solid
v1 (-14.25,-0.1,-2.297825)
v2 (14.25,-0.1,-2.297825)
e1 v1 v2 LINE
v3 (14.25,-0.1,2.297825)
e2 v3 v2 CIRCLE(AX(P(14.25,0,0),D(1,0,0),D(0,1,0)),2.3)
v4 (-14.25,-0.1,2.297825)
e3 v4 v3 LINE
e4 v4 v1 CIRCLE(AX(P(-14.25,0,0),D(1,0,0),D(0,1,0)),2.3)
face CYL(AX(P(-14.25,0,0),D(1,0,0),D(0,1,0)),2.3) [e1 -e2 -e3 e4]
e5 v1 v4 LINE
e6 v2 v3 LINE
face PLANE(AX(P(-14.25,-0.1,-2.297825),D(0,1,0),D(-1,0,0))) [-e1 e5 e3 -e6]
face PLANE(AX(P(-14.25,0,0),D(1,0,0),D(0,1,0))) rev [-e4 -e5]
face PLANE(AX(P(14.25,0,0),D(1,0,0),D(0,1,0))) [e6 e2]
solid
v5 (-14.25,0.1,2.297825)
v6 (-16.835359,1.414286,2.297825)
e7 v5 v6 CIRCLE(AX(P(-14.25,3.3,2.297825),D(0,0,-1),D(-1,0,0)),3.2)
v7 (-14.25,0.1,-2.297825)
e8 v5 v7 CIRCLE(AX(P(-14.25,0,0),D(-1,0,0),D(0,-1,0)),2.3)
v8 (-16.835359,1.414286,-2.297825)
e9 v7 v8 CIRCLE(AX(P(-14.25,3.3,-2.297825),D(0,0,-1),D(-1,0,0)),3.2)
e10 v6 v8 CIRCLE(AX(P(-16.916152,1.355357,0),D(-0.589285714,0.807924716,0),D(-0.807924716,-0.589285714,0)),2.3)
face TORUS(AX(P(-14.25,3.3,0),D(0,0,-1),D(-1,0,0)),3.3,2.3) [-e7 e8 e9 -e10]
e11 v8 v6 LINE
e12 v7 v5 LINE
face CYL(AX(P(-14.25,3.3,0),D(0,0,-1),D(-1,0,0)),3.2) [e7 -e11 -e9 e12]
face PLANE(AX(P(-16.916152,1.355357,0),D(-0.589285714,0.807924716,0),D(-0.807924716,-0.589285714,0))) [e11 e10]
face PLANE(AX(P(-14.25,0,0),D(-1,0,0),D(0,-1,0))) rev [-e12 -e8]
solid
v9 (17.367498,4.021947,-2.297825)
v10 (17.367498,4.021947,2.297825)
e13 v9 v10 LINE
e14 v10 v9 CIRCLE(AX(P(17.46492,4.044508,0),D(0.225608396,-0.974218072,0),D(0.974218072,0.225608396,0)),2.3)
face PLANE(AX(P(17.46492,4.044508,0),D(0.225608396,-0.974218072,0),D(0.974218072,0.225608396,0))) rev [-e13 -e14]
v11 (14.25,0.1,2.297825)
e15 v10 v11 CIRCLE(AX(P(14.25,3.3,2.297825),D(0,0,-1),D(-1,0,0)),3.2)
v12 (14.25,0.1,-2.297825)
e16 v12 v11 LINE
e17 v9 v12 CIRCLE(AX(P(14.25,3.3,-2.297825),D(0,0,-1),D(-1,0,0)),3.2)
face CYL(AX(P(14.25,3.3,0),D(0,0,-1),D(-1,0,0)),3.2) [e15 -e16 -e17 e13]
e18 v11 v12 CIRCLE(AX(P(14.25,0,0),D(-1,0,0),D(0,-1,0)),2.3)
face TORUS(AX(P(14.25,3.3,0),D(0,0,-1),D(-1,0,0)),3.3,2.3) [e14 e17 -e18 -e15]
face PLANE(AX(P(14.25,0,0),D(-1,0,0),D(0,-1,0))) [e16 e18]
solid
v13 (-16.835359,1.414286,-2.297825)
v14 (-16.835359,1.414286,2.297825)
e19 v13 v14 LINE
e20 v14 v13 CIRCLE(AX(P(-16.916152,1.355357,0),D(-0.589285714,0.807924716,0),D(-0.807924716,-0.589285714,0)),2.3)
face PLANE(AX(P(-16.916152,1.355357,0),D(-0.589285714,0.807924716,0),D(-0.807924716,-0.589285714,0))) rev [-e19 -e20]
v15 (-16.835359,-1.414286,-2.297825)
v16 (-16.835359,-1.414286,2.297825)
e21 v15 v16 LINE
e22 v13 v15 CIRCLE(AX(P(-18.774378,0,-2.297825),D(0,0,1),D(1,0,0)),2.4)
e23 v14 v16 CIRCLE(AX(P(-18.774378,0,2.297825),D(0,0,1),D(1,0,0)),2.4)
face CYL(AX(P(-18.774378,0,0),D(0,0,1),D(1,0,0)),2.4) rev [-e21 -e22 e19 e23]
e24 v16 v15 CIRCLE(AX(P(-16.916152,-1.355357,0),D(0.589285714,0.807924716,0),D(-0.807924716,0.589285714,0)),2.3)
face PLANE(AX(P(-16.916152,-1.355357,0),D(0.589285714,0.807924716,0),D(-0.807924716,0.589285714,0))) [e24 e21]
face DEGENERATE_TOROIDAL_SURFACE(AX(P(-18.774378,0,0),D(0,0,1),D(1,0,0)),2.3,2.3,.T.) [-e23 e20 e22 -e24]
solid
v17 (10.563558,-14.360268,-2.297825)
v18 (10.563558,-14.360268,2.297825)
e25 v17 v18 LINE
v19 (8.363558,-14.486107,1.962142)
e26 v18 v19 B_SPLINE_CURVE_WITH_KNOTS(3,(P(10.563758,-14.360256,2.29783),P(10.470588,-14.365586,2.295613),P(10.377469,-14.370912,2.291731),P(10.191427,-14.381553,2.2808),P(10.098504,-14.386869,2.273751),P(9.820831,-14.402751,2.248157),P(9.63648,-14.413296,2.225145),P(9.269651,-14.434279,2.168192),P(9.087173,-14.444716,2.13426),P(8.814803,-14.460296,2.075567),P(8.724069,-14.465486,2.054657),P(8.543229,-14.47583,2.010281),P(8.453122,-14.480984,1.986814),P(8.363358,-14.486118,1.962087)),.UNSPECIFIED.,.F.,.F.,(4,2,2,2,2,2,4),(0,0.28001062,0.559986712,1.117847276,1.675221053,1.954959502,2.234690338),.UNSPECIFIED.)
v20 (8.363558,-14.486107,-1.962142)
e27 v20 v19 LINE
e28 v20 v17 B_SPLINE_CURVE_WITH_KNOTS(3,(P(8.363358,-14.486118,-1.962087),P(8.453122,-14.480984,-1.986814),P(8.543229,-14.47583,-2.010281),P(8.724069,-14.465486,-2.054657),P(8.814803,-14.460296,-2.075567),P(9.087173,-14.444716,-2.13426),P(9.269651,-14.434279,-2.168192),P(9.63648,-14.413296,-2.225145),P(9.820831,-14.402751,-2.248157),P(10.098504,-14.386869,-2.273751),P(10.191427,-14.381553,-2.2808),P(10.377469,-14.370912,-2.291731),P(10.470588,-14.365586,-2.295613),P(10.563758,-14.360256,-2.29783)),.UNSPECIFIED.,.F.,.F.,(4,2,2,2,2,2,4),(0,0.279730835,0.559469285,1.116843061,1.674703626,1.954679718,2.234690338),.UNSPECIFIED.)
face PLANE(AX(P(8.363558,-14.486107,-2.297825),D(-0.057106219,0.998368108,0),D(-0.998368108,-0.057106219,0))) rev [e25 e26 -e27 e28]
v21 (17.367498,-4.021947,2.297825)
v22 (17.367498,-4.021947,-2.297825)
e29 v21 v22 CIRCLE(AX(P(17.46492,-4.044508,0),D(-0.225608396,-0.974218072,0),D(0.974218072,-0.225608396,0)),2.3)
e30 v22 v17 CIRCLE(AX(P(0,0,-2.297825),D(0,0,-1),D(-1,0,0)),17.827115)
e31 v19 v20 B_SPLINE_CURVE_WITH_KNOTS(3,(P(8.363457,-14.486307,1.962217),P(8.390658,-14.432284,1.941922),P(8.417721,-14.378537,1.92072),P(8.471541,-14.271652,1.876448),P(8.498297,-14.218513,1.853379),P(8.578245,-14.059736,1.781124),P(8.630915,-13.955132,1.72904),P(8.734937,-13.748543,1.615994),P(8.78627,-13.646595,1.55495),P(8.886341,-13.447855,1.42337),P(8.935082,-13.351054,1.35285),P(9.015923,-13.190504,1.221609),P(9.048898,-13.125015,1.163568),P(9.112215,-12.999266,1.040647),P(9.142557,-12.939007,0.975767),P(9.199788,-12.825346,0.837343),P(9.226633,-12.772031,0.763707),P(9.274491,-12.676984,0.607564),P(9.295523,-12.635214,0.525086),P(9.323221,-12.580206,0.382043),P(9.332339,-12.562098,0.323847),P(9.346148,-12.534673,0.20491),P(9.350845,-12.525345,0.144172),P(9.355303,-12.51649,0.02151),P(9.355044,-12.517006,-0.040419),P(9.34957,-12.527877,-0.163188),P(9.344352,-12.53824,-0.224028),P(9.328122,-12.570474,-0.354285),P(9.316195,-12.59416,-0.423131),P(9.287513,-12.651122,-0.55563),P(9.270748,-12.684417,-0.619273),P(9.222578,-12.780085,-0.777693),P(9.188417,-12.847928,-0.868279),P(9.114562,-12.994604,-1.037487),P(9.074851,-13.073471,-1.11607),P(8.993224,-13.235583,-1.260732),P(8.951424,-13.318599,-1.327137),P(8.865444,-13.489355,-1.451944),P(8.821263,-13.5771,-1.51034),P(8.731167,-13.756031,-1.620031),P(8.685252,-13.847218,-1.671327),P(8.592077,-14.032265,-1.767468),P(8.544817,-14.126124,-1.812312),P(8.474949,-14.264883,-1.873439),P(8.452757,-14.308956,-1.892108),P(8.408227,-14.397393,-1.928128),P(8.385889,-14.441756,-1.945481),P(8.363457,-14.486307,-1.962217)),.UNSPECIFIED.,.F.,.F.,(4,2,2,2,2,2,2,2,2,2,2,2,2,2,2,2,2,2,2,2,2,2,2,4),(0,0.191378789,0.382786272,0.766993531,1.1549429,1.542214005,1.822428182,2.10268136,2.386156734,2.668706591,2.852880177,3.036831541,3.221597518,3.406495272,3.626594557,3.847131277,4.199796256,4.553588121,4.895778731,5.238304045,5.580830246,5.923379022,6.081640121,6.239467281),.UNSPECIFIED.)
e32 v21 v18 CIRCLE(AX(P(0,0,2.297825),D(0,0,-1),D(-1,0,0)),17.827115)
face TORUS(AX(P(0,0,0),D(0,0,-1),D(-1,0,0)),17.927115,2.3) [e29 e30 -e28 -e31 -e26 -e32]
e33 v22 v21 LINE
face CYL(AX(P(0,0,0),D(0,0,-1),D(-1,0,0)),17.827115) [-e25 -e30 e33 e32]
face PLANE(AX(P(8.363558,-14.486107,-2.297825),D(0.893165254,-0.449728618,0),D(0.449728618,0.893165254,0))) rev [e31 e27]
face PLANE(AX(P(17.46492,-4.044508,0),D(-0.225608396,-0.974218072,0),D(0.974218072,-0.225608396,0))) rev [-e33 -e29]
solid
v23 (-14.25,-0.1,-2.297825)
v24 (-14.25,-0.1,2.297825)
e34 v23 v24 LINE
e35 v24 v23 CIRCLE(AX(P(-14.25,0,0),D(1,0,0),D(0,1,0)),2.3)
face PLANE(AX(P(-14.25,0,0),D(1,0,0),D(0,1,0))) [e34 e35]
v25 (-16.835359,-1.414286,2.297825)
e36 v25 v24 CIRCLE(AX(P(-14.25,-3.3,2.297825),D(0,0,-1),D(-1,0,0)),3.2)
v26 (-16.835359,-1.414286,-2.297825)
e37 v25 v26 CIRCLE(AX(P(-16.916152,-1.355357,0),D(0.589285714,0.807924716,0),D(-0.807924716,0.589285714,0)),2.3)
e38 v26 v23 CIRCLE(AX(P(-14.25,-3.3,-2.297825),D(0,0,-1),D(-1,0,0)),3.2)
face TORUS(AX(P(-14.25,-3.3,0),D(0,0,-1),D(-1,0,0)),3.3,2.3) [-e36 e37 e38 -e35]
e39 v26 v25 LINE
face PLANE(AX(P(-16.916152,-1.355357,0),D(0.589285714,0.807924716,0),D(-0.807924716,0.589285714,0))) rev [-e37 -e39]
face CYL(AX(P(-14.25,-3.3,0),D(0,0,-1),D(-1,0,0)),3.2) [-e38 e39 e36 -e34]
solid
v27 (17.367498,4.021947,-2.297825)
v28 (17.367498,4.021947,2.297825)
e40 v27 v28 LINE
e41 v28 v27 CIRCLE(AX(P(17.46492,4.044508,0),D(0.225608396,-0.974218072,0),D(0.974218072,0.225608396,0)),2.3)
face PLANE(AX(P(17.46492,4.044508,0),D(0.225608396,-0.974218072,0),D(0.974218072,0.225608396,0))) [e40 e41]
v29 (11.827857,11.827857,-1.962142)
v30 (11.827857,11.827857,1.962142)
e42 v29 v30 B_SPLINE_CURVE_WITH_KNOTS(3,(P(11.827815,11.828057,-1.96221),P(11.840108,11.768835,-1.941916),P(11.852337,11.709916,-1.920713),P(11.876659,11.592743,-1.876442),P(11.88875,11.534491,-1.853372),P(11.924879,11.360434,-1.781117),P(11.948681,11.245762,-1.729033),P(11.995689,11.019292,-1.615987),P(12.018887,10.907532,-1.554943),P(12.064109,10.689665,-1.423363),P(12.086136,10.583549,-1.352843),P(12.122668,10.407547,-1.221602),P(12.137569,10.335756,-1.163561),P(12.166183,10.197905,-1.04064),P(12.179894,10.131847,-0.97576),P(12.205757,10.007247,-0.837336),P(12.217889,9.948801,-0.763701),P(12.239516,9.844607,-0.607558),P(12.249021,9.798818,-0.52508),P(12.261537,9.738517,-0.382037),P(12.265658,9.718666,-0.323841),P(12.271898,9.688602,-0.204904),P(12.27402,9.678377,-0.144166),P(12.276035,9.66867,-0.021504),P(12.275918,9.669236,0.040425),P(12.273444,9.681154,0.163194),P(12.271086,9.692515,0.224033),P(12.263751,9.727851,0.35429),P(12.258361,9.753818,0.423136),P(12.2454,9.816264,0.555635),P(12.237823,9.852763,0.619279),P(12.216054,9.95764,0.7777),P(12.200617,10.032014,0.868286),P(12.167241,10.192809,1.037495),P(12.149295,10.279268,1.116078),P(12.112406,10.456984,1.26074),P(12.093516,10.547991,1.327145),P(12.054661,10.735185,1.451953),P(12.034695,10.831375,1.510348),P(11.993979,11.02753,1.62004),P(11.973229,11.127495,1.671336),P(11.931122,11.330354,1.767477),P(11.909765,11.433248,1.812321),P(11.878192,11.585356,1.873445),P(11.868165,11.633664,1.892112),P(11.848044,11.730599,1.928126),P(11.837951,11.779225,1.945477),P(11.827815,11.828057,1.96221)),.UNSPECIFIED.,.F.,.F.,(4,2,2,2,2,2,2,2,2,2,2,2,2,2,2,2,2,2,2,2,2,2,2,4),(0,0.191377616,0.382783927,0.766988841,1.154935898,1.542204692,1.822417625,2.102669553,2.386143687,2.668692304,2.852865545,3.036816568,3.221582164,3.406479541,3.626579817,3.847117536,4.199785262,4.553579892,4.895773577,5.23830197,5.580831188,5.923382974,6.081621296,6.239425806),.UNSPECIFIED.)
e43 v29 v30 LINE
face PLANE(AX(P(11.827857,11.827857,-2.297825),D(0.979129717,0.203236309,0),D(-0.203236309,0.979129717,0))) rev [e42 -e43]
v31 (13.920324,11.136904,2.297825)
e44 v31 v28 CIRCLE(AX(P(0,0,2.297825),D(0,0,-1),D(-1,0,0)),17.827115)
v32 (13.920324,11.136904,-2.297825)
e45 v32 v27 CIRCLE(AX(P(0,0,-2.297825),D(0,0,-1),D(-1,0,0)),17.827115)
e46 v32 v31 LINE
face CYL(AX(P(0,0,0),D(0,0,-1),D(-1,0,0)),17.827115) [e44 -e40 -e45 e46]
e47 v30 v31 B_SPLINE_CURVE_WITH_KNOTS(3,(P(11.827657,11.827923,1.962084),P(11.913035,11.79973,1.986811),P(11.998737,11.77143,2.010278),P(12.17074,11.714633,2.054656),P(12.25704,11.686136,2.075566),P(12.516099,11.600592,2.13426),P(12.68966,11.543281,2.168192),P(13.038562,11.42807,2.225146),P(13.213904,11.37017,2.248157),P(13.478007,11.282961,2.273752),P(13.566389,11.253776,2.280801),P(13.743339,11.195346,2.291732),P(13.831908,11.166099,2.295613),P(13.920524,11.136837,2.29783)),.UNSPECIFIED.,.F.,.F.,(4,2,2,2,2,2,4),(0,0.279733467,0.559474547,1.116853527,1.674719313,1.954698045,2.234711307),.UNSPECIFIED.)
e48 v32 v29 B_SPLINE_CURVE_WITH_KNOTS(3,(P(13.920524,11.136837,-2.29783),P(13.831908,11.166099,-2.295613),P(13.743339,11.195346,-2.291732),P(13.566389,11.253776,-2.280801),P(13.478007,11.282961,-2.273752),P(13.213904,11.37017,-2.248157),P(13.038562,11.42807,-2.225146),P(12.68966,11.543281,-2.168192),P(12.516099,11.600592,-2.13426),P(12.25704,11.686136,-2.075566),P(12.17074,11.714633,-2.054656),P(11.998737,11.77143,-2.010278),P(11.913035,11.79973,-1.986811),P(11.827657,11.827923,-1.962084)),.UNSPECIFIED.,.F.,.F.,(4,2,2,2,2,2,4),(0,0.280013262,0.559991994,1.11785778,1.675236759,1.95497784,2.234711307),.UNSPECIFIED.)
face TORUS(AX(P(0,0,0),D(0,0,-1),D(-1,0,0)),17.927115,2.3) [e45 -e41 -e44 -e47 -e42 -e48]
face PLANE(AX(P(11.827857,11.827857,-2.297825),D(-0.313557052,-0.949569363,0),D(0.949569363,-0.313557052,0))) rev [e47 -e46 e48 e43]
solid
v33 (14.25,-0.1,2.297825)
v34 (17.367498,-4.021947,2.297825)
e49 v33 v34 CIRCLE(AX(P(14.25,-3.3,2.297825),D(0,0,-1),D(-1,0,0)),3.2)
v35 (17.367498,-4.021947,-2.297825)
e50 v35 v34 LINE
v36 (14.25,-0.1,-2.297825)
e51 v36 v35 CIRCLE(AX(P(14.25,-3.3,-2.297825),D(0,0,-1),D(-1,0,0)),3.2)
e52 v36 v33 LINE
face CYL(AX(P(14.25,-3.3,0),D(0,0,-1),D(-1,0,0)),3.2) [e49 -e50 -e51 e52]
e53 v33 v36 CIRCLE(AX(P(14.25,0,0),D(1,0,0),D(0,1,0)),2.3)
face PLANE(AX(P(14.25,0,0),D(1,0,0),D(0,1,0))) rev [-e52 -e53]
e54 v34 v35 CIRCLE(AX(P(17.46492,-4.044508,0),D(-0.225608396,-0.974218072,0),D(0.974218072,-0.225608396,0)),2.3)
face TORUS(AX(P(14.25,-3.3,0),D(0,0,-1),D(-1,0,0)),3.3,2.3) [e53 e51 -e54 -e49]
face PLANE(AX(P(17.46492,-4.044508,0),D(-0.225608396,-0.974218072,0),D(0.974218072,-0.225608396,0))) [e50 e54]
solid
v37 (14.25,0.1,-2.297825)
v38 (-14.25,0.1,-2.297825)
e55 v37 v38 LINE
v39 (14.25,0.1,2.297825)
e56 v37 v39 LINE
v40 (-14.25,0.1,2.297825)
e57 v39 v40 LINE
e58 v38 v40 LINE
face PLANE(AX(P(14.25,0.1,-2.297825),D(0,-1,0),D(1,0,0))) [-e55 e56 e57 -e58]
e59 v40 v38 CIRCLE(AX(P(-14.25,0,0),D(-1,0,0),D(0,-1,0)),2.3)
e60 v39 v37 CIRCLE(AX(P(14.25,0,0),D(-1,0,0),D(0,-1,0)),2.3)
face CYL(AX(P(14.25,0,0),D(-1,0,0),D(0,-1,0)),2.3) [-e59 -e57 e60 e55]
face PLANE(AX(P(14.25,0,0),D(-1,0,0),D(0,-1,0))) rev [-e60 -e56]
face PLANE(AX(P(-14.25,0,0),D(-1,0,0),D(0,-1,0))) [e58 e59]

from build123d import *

# Parameters (mm, degrees)
STRUCTURAL_MEMBER1_ANGLE   = 46.961343
STRUCTURAL_MEMBER1_2_ANGLE = 103.038657
STRUCTURAL_START           = -14.25
STRUCTURAL_MEMBER1_3_DEPTH = 28.5
STRUCTURAL_MEMBER1_4_ANGLE = 53.893663
STRUCTURAL_MEMBER1_5_ANGLE = 287.787327
STRUCTURAL_MEMBER1_6_ANGLE = 53.893663
STRUCTURAL_MEMBER1_7_DEPTH = 28.5
STRUCTURAL_MEMBER1_8_ANGLE = 103.038657
STRUCTURAL_MEMBER1_9_ANGLE = 31.961343
EXTRUDE1_DEPTH             = 29.106869247
EXTRUDE1_DEPTH_BACK        = 29.106869247


# Read off the part's stored shape, not the designer's step: Structural Member1
with BuildPart() as part:
    # Structural Member1 outline → Structural Member1 (revolve)
    with BuildSketch(Plane(origin=(0, 0, 0), x_dir=(0.5000000000000149, -0.86602540378443, 0), z_dir=(-0.86602540378443, -0.5000000000000149, 0))):
        with BuildLine():
            ThreePointArc((17.827115232, 2.297825059), (15.627115232, 0), (17.827115232, -2.297825059))
            Line((17.827115232, -2.297825059), (17.827115232, 2.297825059))
        make_face()
    revolve(axis=Axis((0, 0, 0), (0, 0, 1)), revolution_arc=STRUCTURAL_MEMBER1_ANGLE)


with BuildPart() as body_2:
    # Structural Member1 2 outline → Structural Member1 2 (revolve)
    with BuildSketch(Plane(origin=(14.25, -3.3, 0), x_dir=(0.974218072006789, -0.2256083956225363, 0), z_dir=(-0.2256083956225363, -0.974218072006789, 0))):
        with BuildLine():
            ThreePointArc((3.2, 2.297825059), (1, 0), (3.2, -2.297825059))
            Line((3.2, -2.297825059), (3.2, 2.297825059))
        make_face()
    revolve(axis=Axis((14.25, -3.3, 0), (0, 0, 1)), revolution_arc=STRUCTURAL_MEMBER1_2_ANGLE)


with BuildPart() as body_3:
    # Structural Member1 3 outline → Structural Member1 3 (new body)
    with BuildSketch(Plane.YZ.offset(STRUCTURAL_START)):
        with BuildLine():
            Line((-0.1, -2.297825059), (-0.1, 2.297825059))
            ThreePointArc((-0.1, 2.297825059), (-2.3, 0), (-0.1, -2.297825059))
        make_face()
    extrude(amount=STRUCTURAL_MEMBER1_3_DEPTH)


with BuildPart() as body_4:
    # Structural Member1 4 outline → Structural Member1 4 (revolve)
    with BuildSketch(Plane(origin=(-14.25, -3.3, 0), x_dir=(0, 1, 0), z_dir=(1, 0, 0))):
        with BuildLine():
            ThreePointArc((3.2, 2.297825059), (1, 0), (3.2, -2.297825059))
            Line((3.2, -2.297825059), (3.2, 2.297825059))
        make_face()
    revolve(axis=Axis((-14.25, -3.3, 0), (0, 0, 1)), revolution_arc=STRUCTURAL_MEMBER1_4_ANGLE)


with BuildPart() as body_5:
    # Structural Member1 5 outline → Structural Member1 5 (revolve)
    with BuildSketch(Plane(origin=(-18.77437841, 0, 0), x_dir=(0.8079247161331453, 0.5892857142856737, 0), z_dir=(0.5892857142856737, -0.8079247161331453, 0))):
        with BuildLine():
            Line((2.4, 2.297825059), (2.4, -2.297825059))
            ThreePointArc((2.4, -2.297825059), (4.6, 0), (2.4, 2.297825059))
        make_face()
    revolve(axis=Axis((-18.77437841, 0, 0), (0, 0, 1)), revolution_arc=STRUCTURAL_MEMBER1_5_ANGLE)


with BuildPart() as body_6:
    # Structural Member1 6 outline → Structural Member1 6 (revolve)
    with BuildSketch(Plane(origin=(-14.25, 3.3, 0), x_dir=(-0.8079247161331524, -0.5892857142856639, 0), z_dir=(-0.5892857142856639, 0.8079247161331524, 0))):
        with BuildLine():
            ThreePointArc((3.2, 2.297825059), (1, 0), (3.2, -2.297825059))
            Line((3.2, -2.297825059), (3.2, 2.297825059))
        make_face()
    revolve(axis=Axis((-14.25, 3.3, 0), (0, 0, 1)), revolution_arc=STRUCTURAL_MEMBER1_6_ANGLE)


with BuildPart() as body_7:
    # Structural Member1 7 outline → Structural Member1 7 (new body)
    with BuildSketch(Plane.YZ.offset(STRUCTURAL_START)):
        with BuildLine():
            ThreePointArc((0.1, -2.297825059), (2.3, 0), (0.1, 2.297825059))
            Line((0.1, 2.297825059), (0.1, -2.297825059))
        make_face()
    extrude(amount=STRUCTURAL_MEMBER1_7_DEPTH)


with BuildPart() as body_8:
    # Structural Member1 8 outline → Structural Member1 8 (revolve)
    with BuildSketch(Plane(origin=(14.25, 3.3, 0), x_dir=(0, -1, 0), z_dir=(-1, 0, 0))):
        with BuildLine():
            ThreePointArc((3.2, 2.297825059), (1, 0), (3.2, -2.297825059))
            Line((3.2, -2.297825059), (3.2, 2.297825059))
        make_face()
    revolve(axis=Axis((14.25, 3.3, 0), (0, 0, 1)), revolution_arc=STRUCTURAL_MEMBER1_8_ANGLE)


with BuildPart() as body_9:
    # Structural Member1 9 outline → Structural Member1 9 (revolve)
    with BuildSketch(Plane(origin=(0, 0, 0), x_dir=(0.9742180720067738, 0.22560839562260226, 0), z_dir=(0.22560839562260226, -0.9742180720067738, 0))):
        with BuildLine():
            ThreePointArc((17.827115232, 2.297825059), (15.627115232, 0), (17.827115232, -2.297825059))
            Line((17.827115232, -2.297825059), (17.827115232, 2.297825059))
        make_face()
    revolve(axis=Axis((0, 0, 0), (0, 0, 1)), revolution_arc=STRUCTURAL_MEMBER1_9_ANGLE)


with BuildPart() as extrude1_tool:
    # Sketch12 → Extrude1 (new, two sides: drawn at the far end of the back side and taken through both)
    with BuildSketch(Plane.XY.offset(-EXTRUDE1_DEPTH_BACK)):
        with BuildLine():
            Line((11.82785661, 11.82785661), (13.920323888, 11.136903534))
            ThreePointArc((13.920323888, 11.136903534), (10.361203328, 13.472473166), (12.275707333, 9.670250253))
            Line((12.275707333, 9.670250253), (11.82785661, 11.82785661))
        make_face()
        with BuildLine():
            Line((8.363557616, -14.486106723), (10.563557616, -14.360267685))
            ThreePointArc((10.563557616, -14.360267685), (6.521221246, -15.695086526), (9.354577812, -12.517931315))
            Line((9.354577812, -12.517931315), (8.363557616, -14.486106723))
        make_face()
    extrude(amount=EXTRUDE1_DEPTH + EXTRUDE1_DEPTH_BACK)


with BuildPart() as part_1:
    add(part.part)

    # Extrude1: cut by extrude1_tool
    add(extrude1_tool.part, mode=Mode.SUBTRACT)


with BuildPart() as body_9_1:
    add(body_9.part)

    # Extrude1: cut by extrude1_tool
    add(extrude1_tool.part, mode=Mode.SUBTRACT)


solid = Compound([body_2.part, body_3.part, body_4.part, body_5.part, body_6.part, body_7.part, body_8.part, part_1.part, body_9_1.part])
